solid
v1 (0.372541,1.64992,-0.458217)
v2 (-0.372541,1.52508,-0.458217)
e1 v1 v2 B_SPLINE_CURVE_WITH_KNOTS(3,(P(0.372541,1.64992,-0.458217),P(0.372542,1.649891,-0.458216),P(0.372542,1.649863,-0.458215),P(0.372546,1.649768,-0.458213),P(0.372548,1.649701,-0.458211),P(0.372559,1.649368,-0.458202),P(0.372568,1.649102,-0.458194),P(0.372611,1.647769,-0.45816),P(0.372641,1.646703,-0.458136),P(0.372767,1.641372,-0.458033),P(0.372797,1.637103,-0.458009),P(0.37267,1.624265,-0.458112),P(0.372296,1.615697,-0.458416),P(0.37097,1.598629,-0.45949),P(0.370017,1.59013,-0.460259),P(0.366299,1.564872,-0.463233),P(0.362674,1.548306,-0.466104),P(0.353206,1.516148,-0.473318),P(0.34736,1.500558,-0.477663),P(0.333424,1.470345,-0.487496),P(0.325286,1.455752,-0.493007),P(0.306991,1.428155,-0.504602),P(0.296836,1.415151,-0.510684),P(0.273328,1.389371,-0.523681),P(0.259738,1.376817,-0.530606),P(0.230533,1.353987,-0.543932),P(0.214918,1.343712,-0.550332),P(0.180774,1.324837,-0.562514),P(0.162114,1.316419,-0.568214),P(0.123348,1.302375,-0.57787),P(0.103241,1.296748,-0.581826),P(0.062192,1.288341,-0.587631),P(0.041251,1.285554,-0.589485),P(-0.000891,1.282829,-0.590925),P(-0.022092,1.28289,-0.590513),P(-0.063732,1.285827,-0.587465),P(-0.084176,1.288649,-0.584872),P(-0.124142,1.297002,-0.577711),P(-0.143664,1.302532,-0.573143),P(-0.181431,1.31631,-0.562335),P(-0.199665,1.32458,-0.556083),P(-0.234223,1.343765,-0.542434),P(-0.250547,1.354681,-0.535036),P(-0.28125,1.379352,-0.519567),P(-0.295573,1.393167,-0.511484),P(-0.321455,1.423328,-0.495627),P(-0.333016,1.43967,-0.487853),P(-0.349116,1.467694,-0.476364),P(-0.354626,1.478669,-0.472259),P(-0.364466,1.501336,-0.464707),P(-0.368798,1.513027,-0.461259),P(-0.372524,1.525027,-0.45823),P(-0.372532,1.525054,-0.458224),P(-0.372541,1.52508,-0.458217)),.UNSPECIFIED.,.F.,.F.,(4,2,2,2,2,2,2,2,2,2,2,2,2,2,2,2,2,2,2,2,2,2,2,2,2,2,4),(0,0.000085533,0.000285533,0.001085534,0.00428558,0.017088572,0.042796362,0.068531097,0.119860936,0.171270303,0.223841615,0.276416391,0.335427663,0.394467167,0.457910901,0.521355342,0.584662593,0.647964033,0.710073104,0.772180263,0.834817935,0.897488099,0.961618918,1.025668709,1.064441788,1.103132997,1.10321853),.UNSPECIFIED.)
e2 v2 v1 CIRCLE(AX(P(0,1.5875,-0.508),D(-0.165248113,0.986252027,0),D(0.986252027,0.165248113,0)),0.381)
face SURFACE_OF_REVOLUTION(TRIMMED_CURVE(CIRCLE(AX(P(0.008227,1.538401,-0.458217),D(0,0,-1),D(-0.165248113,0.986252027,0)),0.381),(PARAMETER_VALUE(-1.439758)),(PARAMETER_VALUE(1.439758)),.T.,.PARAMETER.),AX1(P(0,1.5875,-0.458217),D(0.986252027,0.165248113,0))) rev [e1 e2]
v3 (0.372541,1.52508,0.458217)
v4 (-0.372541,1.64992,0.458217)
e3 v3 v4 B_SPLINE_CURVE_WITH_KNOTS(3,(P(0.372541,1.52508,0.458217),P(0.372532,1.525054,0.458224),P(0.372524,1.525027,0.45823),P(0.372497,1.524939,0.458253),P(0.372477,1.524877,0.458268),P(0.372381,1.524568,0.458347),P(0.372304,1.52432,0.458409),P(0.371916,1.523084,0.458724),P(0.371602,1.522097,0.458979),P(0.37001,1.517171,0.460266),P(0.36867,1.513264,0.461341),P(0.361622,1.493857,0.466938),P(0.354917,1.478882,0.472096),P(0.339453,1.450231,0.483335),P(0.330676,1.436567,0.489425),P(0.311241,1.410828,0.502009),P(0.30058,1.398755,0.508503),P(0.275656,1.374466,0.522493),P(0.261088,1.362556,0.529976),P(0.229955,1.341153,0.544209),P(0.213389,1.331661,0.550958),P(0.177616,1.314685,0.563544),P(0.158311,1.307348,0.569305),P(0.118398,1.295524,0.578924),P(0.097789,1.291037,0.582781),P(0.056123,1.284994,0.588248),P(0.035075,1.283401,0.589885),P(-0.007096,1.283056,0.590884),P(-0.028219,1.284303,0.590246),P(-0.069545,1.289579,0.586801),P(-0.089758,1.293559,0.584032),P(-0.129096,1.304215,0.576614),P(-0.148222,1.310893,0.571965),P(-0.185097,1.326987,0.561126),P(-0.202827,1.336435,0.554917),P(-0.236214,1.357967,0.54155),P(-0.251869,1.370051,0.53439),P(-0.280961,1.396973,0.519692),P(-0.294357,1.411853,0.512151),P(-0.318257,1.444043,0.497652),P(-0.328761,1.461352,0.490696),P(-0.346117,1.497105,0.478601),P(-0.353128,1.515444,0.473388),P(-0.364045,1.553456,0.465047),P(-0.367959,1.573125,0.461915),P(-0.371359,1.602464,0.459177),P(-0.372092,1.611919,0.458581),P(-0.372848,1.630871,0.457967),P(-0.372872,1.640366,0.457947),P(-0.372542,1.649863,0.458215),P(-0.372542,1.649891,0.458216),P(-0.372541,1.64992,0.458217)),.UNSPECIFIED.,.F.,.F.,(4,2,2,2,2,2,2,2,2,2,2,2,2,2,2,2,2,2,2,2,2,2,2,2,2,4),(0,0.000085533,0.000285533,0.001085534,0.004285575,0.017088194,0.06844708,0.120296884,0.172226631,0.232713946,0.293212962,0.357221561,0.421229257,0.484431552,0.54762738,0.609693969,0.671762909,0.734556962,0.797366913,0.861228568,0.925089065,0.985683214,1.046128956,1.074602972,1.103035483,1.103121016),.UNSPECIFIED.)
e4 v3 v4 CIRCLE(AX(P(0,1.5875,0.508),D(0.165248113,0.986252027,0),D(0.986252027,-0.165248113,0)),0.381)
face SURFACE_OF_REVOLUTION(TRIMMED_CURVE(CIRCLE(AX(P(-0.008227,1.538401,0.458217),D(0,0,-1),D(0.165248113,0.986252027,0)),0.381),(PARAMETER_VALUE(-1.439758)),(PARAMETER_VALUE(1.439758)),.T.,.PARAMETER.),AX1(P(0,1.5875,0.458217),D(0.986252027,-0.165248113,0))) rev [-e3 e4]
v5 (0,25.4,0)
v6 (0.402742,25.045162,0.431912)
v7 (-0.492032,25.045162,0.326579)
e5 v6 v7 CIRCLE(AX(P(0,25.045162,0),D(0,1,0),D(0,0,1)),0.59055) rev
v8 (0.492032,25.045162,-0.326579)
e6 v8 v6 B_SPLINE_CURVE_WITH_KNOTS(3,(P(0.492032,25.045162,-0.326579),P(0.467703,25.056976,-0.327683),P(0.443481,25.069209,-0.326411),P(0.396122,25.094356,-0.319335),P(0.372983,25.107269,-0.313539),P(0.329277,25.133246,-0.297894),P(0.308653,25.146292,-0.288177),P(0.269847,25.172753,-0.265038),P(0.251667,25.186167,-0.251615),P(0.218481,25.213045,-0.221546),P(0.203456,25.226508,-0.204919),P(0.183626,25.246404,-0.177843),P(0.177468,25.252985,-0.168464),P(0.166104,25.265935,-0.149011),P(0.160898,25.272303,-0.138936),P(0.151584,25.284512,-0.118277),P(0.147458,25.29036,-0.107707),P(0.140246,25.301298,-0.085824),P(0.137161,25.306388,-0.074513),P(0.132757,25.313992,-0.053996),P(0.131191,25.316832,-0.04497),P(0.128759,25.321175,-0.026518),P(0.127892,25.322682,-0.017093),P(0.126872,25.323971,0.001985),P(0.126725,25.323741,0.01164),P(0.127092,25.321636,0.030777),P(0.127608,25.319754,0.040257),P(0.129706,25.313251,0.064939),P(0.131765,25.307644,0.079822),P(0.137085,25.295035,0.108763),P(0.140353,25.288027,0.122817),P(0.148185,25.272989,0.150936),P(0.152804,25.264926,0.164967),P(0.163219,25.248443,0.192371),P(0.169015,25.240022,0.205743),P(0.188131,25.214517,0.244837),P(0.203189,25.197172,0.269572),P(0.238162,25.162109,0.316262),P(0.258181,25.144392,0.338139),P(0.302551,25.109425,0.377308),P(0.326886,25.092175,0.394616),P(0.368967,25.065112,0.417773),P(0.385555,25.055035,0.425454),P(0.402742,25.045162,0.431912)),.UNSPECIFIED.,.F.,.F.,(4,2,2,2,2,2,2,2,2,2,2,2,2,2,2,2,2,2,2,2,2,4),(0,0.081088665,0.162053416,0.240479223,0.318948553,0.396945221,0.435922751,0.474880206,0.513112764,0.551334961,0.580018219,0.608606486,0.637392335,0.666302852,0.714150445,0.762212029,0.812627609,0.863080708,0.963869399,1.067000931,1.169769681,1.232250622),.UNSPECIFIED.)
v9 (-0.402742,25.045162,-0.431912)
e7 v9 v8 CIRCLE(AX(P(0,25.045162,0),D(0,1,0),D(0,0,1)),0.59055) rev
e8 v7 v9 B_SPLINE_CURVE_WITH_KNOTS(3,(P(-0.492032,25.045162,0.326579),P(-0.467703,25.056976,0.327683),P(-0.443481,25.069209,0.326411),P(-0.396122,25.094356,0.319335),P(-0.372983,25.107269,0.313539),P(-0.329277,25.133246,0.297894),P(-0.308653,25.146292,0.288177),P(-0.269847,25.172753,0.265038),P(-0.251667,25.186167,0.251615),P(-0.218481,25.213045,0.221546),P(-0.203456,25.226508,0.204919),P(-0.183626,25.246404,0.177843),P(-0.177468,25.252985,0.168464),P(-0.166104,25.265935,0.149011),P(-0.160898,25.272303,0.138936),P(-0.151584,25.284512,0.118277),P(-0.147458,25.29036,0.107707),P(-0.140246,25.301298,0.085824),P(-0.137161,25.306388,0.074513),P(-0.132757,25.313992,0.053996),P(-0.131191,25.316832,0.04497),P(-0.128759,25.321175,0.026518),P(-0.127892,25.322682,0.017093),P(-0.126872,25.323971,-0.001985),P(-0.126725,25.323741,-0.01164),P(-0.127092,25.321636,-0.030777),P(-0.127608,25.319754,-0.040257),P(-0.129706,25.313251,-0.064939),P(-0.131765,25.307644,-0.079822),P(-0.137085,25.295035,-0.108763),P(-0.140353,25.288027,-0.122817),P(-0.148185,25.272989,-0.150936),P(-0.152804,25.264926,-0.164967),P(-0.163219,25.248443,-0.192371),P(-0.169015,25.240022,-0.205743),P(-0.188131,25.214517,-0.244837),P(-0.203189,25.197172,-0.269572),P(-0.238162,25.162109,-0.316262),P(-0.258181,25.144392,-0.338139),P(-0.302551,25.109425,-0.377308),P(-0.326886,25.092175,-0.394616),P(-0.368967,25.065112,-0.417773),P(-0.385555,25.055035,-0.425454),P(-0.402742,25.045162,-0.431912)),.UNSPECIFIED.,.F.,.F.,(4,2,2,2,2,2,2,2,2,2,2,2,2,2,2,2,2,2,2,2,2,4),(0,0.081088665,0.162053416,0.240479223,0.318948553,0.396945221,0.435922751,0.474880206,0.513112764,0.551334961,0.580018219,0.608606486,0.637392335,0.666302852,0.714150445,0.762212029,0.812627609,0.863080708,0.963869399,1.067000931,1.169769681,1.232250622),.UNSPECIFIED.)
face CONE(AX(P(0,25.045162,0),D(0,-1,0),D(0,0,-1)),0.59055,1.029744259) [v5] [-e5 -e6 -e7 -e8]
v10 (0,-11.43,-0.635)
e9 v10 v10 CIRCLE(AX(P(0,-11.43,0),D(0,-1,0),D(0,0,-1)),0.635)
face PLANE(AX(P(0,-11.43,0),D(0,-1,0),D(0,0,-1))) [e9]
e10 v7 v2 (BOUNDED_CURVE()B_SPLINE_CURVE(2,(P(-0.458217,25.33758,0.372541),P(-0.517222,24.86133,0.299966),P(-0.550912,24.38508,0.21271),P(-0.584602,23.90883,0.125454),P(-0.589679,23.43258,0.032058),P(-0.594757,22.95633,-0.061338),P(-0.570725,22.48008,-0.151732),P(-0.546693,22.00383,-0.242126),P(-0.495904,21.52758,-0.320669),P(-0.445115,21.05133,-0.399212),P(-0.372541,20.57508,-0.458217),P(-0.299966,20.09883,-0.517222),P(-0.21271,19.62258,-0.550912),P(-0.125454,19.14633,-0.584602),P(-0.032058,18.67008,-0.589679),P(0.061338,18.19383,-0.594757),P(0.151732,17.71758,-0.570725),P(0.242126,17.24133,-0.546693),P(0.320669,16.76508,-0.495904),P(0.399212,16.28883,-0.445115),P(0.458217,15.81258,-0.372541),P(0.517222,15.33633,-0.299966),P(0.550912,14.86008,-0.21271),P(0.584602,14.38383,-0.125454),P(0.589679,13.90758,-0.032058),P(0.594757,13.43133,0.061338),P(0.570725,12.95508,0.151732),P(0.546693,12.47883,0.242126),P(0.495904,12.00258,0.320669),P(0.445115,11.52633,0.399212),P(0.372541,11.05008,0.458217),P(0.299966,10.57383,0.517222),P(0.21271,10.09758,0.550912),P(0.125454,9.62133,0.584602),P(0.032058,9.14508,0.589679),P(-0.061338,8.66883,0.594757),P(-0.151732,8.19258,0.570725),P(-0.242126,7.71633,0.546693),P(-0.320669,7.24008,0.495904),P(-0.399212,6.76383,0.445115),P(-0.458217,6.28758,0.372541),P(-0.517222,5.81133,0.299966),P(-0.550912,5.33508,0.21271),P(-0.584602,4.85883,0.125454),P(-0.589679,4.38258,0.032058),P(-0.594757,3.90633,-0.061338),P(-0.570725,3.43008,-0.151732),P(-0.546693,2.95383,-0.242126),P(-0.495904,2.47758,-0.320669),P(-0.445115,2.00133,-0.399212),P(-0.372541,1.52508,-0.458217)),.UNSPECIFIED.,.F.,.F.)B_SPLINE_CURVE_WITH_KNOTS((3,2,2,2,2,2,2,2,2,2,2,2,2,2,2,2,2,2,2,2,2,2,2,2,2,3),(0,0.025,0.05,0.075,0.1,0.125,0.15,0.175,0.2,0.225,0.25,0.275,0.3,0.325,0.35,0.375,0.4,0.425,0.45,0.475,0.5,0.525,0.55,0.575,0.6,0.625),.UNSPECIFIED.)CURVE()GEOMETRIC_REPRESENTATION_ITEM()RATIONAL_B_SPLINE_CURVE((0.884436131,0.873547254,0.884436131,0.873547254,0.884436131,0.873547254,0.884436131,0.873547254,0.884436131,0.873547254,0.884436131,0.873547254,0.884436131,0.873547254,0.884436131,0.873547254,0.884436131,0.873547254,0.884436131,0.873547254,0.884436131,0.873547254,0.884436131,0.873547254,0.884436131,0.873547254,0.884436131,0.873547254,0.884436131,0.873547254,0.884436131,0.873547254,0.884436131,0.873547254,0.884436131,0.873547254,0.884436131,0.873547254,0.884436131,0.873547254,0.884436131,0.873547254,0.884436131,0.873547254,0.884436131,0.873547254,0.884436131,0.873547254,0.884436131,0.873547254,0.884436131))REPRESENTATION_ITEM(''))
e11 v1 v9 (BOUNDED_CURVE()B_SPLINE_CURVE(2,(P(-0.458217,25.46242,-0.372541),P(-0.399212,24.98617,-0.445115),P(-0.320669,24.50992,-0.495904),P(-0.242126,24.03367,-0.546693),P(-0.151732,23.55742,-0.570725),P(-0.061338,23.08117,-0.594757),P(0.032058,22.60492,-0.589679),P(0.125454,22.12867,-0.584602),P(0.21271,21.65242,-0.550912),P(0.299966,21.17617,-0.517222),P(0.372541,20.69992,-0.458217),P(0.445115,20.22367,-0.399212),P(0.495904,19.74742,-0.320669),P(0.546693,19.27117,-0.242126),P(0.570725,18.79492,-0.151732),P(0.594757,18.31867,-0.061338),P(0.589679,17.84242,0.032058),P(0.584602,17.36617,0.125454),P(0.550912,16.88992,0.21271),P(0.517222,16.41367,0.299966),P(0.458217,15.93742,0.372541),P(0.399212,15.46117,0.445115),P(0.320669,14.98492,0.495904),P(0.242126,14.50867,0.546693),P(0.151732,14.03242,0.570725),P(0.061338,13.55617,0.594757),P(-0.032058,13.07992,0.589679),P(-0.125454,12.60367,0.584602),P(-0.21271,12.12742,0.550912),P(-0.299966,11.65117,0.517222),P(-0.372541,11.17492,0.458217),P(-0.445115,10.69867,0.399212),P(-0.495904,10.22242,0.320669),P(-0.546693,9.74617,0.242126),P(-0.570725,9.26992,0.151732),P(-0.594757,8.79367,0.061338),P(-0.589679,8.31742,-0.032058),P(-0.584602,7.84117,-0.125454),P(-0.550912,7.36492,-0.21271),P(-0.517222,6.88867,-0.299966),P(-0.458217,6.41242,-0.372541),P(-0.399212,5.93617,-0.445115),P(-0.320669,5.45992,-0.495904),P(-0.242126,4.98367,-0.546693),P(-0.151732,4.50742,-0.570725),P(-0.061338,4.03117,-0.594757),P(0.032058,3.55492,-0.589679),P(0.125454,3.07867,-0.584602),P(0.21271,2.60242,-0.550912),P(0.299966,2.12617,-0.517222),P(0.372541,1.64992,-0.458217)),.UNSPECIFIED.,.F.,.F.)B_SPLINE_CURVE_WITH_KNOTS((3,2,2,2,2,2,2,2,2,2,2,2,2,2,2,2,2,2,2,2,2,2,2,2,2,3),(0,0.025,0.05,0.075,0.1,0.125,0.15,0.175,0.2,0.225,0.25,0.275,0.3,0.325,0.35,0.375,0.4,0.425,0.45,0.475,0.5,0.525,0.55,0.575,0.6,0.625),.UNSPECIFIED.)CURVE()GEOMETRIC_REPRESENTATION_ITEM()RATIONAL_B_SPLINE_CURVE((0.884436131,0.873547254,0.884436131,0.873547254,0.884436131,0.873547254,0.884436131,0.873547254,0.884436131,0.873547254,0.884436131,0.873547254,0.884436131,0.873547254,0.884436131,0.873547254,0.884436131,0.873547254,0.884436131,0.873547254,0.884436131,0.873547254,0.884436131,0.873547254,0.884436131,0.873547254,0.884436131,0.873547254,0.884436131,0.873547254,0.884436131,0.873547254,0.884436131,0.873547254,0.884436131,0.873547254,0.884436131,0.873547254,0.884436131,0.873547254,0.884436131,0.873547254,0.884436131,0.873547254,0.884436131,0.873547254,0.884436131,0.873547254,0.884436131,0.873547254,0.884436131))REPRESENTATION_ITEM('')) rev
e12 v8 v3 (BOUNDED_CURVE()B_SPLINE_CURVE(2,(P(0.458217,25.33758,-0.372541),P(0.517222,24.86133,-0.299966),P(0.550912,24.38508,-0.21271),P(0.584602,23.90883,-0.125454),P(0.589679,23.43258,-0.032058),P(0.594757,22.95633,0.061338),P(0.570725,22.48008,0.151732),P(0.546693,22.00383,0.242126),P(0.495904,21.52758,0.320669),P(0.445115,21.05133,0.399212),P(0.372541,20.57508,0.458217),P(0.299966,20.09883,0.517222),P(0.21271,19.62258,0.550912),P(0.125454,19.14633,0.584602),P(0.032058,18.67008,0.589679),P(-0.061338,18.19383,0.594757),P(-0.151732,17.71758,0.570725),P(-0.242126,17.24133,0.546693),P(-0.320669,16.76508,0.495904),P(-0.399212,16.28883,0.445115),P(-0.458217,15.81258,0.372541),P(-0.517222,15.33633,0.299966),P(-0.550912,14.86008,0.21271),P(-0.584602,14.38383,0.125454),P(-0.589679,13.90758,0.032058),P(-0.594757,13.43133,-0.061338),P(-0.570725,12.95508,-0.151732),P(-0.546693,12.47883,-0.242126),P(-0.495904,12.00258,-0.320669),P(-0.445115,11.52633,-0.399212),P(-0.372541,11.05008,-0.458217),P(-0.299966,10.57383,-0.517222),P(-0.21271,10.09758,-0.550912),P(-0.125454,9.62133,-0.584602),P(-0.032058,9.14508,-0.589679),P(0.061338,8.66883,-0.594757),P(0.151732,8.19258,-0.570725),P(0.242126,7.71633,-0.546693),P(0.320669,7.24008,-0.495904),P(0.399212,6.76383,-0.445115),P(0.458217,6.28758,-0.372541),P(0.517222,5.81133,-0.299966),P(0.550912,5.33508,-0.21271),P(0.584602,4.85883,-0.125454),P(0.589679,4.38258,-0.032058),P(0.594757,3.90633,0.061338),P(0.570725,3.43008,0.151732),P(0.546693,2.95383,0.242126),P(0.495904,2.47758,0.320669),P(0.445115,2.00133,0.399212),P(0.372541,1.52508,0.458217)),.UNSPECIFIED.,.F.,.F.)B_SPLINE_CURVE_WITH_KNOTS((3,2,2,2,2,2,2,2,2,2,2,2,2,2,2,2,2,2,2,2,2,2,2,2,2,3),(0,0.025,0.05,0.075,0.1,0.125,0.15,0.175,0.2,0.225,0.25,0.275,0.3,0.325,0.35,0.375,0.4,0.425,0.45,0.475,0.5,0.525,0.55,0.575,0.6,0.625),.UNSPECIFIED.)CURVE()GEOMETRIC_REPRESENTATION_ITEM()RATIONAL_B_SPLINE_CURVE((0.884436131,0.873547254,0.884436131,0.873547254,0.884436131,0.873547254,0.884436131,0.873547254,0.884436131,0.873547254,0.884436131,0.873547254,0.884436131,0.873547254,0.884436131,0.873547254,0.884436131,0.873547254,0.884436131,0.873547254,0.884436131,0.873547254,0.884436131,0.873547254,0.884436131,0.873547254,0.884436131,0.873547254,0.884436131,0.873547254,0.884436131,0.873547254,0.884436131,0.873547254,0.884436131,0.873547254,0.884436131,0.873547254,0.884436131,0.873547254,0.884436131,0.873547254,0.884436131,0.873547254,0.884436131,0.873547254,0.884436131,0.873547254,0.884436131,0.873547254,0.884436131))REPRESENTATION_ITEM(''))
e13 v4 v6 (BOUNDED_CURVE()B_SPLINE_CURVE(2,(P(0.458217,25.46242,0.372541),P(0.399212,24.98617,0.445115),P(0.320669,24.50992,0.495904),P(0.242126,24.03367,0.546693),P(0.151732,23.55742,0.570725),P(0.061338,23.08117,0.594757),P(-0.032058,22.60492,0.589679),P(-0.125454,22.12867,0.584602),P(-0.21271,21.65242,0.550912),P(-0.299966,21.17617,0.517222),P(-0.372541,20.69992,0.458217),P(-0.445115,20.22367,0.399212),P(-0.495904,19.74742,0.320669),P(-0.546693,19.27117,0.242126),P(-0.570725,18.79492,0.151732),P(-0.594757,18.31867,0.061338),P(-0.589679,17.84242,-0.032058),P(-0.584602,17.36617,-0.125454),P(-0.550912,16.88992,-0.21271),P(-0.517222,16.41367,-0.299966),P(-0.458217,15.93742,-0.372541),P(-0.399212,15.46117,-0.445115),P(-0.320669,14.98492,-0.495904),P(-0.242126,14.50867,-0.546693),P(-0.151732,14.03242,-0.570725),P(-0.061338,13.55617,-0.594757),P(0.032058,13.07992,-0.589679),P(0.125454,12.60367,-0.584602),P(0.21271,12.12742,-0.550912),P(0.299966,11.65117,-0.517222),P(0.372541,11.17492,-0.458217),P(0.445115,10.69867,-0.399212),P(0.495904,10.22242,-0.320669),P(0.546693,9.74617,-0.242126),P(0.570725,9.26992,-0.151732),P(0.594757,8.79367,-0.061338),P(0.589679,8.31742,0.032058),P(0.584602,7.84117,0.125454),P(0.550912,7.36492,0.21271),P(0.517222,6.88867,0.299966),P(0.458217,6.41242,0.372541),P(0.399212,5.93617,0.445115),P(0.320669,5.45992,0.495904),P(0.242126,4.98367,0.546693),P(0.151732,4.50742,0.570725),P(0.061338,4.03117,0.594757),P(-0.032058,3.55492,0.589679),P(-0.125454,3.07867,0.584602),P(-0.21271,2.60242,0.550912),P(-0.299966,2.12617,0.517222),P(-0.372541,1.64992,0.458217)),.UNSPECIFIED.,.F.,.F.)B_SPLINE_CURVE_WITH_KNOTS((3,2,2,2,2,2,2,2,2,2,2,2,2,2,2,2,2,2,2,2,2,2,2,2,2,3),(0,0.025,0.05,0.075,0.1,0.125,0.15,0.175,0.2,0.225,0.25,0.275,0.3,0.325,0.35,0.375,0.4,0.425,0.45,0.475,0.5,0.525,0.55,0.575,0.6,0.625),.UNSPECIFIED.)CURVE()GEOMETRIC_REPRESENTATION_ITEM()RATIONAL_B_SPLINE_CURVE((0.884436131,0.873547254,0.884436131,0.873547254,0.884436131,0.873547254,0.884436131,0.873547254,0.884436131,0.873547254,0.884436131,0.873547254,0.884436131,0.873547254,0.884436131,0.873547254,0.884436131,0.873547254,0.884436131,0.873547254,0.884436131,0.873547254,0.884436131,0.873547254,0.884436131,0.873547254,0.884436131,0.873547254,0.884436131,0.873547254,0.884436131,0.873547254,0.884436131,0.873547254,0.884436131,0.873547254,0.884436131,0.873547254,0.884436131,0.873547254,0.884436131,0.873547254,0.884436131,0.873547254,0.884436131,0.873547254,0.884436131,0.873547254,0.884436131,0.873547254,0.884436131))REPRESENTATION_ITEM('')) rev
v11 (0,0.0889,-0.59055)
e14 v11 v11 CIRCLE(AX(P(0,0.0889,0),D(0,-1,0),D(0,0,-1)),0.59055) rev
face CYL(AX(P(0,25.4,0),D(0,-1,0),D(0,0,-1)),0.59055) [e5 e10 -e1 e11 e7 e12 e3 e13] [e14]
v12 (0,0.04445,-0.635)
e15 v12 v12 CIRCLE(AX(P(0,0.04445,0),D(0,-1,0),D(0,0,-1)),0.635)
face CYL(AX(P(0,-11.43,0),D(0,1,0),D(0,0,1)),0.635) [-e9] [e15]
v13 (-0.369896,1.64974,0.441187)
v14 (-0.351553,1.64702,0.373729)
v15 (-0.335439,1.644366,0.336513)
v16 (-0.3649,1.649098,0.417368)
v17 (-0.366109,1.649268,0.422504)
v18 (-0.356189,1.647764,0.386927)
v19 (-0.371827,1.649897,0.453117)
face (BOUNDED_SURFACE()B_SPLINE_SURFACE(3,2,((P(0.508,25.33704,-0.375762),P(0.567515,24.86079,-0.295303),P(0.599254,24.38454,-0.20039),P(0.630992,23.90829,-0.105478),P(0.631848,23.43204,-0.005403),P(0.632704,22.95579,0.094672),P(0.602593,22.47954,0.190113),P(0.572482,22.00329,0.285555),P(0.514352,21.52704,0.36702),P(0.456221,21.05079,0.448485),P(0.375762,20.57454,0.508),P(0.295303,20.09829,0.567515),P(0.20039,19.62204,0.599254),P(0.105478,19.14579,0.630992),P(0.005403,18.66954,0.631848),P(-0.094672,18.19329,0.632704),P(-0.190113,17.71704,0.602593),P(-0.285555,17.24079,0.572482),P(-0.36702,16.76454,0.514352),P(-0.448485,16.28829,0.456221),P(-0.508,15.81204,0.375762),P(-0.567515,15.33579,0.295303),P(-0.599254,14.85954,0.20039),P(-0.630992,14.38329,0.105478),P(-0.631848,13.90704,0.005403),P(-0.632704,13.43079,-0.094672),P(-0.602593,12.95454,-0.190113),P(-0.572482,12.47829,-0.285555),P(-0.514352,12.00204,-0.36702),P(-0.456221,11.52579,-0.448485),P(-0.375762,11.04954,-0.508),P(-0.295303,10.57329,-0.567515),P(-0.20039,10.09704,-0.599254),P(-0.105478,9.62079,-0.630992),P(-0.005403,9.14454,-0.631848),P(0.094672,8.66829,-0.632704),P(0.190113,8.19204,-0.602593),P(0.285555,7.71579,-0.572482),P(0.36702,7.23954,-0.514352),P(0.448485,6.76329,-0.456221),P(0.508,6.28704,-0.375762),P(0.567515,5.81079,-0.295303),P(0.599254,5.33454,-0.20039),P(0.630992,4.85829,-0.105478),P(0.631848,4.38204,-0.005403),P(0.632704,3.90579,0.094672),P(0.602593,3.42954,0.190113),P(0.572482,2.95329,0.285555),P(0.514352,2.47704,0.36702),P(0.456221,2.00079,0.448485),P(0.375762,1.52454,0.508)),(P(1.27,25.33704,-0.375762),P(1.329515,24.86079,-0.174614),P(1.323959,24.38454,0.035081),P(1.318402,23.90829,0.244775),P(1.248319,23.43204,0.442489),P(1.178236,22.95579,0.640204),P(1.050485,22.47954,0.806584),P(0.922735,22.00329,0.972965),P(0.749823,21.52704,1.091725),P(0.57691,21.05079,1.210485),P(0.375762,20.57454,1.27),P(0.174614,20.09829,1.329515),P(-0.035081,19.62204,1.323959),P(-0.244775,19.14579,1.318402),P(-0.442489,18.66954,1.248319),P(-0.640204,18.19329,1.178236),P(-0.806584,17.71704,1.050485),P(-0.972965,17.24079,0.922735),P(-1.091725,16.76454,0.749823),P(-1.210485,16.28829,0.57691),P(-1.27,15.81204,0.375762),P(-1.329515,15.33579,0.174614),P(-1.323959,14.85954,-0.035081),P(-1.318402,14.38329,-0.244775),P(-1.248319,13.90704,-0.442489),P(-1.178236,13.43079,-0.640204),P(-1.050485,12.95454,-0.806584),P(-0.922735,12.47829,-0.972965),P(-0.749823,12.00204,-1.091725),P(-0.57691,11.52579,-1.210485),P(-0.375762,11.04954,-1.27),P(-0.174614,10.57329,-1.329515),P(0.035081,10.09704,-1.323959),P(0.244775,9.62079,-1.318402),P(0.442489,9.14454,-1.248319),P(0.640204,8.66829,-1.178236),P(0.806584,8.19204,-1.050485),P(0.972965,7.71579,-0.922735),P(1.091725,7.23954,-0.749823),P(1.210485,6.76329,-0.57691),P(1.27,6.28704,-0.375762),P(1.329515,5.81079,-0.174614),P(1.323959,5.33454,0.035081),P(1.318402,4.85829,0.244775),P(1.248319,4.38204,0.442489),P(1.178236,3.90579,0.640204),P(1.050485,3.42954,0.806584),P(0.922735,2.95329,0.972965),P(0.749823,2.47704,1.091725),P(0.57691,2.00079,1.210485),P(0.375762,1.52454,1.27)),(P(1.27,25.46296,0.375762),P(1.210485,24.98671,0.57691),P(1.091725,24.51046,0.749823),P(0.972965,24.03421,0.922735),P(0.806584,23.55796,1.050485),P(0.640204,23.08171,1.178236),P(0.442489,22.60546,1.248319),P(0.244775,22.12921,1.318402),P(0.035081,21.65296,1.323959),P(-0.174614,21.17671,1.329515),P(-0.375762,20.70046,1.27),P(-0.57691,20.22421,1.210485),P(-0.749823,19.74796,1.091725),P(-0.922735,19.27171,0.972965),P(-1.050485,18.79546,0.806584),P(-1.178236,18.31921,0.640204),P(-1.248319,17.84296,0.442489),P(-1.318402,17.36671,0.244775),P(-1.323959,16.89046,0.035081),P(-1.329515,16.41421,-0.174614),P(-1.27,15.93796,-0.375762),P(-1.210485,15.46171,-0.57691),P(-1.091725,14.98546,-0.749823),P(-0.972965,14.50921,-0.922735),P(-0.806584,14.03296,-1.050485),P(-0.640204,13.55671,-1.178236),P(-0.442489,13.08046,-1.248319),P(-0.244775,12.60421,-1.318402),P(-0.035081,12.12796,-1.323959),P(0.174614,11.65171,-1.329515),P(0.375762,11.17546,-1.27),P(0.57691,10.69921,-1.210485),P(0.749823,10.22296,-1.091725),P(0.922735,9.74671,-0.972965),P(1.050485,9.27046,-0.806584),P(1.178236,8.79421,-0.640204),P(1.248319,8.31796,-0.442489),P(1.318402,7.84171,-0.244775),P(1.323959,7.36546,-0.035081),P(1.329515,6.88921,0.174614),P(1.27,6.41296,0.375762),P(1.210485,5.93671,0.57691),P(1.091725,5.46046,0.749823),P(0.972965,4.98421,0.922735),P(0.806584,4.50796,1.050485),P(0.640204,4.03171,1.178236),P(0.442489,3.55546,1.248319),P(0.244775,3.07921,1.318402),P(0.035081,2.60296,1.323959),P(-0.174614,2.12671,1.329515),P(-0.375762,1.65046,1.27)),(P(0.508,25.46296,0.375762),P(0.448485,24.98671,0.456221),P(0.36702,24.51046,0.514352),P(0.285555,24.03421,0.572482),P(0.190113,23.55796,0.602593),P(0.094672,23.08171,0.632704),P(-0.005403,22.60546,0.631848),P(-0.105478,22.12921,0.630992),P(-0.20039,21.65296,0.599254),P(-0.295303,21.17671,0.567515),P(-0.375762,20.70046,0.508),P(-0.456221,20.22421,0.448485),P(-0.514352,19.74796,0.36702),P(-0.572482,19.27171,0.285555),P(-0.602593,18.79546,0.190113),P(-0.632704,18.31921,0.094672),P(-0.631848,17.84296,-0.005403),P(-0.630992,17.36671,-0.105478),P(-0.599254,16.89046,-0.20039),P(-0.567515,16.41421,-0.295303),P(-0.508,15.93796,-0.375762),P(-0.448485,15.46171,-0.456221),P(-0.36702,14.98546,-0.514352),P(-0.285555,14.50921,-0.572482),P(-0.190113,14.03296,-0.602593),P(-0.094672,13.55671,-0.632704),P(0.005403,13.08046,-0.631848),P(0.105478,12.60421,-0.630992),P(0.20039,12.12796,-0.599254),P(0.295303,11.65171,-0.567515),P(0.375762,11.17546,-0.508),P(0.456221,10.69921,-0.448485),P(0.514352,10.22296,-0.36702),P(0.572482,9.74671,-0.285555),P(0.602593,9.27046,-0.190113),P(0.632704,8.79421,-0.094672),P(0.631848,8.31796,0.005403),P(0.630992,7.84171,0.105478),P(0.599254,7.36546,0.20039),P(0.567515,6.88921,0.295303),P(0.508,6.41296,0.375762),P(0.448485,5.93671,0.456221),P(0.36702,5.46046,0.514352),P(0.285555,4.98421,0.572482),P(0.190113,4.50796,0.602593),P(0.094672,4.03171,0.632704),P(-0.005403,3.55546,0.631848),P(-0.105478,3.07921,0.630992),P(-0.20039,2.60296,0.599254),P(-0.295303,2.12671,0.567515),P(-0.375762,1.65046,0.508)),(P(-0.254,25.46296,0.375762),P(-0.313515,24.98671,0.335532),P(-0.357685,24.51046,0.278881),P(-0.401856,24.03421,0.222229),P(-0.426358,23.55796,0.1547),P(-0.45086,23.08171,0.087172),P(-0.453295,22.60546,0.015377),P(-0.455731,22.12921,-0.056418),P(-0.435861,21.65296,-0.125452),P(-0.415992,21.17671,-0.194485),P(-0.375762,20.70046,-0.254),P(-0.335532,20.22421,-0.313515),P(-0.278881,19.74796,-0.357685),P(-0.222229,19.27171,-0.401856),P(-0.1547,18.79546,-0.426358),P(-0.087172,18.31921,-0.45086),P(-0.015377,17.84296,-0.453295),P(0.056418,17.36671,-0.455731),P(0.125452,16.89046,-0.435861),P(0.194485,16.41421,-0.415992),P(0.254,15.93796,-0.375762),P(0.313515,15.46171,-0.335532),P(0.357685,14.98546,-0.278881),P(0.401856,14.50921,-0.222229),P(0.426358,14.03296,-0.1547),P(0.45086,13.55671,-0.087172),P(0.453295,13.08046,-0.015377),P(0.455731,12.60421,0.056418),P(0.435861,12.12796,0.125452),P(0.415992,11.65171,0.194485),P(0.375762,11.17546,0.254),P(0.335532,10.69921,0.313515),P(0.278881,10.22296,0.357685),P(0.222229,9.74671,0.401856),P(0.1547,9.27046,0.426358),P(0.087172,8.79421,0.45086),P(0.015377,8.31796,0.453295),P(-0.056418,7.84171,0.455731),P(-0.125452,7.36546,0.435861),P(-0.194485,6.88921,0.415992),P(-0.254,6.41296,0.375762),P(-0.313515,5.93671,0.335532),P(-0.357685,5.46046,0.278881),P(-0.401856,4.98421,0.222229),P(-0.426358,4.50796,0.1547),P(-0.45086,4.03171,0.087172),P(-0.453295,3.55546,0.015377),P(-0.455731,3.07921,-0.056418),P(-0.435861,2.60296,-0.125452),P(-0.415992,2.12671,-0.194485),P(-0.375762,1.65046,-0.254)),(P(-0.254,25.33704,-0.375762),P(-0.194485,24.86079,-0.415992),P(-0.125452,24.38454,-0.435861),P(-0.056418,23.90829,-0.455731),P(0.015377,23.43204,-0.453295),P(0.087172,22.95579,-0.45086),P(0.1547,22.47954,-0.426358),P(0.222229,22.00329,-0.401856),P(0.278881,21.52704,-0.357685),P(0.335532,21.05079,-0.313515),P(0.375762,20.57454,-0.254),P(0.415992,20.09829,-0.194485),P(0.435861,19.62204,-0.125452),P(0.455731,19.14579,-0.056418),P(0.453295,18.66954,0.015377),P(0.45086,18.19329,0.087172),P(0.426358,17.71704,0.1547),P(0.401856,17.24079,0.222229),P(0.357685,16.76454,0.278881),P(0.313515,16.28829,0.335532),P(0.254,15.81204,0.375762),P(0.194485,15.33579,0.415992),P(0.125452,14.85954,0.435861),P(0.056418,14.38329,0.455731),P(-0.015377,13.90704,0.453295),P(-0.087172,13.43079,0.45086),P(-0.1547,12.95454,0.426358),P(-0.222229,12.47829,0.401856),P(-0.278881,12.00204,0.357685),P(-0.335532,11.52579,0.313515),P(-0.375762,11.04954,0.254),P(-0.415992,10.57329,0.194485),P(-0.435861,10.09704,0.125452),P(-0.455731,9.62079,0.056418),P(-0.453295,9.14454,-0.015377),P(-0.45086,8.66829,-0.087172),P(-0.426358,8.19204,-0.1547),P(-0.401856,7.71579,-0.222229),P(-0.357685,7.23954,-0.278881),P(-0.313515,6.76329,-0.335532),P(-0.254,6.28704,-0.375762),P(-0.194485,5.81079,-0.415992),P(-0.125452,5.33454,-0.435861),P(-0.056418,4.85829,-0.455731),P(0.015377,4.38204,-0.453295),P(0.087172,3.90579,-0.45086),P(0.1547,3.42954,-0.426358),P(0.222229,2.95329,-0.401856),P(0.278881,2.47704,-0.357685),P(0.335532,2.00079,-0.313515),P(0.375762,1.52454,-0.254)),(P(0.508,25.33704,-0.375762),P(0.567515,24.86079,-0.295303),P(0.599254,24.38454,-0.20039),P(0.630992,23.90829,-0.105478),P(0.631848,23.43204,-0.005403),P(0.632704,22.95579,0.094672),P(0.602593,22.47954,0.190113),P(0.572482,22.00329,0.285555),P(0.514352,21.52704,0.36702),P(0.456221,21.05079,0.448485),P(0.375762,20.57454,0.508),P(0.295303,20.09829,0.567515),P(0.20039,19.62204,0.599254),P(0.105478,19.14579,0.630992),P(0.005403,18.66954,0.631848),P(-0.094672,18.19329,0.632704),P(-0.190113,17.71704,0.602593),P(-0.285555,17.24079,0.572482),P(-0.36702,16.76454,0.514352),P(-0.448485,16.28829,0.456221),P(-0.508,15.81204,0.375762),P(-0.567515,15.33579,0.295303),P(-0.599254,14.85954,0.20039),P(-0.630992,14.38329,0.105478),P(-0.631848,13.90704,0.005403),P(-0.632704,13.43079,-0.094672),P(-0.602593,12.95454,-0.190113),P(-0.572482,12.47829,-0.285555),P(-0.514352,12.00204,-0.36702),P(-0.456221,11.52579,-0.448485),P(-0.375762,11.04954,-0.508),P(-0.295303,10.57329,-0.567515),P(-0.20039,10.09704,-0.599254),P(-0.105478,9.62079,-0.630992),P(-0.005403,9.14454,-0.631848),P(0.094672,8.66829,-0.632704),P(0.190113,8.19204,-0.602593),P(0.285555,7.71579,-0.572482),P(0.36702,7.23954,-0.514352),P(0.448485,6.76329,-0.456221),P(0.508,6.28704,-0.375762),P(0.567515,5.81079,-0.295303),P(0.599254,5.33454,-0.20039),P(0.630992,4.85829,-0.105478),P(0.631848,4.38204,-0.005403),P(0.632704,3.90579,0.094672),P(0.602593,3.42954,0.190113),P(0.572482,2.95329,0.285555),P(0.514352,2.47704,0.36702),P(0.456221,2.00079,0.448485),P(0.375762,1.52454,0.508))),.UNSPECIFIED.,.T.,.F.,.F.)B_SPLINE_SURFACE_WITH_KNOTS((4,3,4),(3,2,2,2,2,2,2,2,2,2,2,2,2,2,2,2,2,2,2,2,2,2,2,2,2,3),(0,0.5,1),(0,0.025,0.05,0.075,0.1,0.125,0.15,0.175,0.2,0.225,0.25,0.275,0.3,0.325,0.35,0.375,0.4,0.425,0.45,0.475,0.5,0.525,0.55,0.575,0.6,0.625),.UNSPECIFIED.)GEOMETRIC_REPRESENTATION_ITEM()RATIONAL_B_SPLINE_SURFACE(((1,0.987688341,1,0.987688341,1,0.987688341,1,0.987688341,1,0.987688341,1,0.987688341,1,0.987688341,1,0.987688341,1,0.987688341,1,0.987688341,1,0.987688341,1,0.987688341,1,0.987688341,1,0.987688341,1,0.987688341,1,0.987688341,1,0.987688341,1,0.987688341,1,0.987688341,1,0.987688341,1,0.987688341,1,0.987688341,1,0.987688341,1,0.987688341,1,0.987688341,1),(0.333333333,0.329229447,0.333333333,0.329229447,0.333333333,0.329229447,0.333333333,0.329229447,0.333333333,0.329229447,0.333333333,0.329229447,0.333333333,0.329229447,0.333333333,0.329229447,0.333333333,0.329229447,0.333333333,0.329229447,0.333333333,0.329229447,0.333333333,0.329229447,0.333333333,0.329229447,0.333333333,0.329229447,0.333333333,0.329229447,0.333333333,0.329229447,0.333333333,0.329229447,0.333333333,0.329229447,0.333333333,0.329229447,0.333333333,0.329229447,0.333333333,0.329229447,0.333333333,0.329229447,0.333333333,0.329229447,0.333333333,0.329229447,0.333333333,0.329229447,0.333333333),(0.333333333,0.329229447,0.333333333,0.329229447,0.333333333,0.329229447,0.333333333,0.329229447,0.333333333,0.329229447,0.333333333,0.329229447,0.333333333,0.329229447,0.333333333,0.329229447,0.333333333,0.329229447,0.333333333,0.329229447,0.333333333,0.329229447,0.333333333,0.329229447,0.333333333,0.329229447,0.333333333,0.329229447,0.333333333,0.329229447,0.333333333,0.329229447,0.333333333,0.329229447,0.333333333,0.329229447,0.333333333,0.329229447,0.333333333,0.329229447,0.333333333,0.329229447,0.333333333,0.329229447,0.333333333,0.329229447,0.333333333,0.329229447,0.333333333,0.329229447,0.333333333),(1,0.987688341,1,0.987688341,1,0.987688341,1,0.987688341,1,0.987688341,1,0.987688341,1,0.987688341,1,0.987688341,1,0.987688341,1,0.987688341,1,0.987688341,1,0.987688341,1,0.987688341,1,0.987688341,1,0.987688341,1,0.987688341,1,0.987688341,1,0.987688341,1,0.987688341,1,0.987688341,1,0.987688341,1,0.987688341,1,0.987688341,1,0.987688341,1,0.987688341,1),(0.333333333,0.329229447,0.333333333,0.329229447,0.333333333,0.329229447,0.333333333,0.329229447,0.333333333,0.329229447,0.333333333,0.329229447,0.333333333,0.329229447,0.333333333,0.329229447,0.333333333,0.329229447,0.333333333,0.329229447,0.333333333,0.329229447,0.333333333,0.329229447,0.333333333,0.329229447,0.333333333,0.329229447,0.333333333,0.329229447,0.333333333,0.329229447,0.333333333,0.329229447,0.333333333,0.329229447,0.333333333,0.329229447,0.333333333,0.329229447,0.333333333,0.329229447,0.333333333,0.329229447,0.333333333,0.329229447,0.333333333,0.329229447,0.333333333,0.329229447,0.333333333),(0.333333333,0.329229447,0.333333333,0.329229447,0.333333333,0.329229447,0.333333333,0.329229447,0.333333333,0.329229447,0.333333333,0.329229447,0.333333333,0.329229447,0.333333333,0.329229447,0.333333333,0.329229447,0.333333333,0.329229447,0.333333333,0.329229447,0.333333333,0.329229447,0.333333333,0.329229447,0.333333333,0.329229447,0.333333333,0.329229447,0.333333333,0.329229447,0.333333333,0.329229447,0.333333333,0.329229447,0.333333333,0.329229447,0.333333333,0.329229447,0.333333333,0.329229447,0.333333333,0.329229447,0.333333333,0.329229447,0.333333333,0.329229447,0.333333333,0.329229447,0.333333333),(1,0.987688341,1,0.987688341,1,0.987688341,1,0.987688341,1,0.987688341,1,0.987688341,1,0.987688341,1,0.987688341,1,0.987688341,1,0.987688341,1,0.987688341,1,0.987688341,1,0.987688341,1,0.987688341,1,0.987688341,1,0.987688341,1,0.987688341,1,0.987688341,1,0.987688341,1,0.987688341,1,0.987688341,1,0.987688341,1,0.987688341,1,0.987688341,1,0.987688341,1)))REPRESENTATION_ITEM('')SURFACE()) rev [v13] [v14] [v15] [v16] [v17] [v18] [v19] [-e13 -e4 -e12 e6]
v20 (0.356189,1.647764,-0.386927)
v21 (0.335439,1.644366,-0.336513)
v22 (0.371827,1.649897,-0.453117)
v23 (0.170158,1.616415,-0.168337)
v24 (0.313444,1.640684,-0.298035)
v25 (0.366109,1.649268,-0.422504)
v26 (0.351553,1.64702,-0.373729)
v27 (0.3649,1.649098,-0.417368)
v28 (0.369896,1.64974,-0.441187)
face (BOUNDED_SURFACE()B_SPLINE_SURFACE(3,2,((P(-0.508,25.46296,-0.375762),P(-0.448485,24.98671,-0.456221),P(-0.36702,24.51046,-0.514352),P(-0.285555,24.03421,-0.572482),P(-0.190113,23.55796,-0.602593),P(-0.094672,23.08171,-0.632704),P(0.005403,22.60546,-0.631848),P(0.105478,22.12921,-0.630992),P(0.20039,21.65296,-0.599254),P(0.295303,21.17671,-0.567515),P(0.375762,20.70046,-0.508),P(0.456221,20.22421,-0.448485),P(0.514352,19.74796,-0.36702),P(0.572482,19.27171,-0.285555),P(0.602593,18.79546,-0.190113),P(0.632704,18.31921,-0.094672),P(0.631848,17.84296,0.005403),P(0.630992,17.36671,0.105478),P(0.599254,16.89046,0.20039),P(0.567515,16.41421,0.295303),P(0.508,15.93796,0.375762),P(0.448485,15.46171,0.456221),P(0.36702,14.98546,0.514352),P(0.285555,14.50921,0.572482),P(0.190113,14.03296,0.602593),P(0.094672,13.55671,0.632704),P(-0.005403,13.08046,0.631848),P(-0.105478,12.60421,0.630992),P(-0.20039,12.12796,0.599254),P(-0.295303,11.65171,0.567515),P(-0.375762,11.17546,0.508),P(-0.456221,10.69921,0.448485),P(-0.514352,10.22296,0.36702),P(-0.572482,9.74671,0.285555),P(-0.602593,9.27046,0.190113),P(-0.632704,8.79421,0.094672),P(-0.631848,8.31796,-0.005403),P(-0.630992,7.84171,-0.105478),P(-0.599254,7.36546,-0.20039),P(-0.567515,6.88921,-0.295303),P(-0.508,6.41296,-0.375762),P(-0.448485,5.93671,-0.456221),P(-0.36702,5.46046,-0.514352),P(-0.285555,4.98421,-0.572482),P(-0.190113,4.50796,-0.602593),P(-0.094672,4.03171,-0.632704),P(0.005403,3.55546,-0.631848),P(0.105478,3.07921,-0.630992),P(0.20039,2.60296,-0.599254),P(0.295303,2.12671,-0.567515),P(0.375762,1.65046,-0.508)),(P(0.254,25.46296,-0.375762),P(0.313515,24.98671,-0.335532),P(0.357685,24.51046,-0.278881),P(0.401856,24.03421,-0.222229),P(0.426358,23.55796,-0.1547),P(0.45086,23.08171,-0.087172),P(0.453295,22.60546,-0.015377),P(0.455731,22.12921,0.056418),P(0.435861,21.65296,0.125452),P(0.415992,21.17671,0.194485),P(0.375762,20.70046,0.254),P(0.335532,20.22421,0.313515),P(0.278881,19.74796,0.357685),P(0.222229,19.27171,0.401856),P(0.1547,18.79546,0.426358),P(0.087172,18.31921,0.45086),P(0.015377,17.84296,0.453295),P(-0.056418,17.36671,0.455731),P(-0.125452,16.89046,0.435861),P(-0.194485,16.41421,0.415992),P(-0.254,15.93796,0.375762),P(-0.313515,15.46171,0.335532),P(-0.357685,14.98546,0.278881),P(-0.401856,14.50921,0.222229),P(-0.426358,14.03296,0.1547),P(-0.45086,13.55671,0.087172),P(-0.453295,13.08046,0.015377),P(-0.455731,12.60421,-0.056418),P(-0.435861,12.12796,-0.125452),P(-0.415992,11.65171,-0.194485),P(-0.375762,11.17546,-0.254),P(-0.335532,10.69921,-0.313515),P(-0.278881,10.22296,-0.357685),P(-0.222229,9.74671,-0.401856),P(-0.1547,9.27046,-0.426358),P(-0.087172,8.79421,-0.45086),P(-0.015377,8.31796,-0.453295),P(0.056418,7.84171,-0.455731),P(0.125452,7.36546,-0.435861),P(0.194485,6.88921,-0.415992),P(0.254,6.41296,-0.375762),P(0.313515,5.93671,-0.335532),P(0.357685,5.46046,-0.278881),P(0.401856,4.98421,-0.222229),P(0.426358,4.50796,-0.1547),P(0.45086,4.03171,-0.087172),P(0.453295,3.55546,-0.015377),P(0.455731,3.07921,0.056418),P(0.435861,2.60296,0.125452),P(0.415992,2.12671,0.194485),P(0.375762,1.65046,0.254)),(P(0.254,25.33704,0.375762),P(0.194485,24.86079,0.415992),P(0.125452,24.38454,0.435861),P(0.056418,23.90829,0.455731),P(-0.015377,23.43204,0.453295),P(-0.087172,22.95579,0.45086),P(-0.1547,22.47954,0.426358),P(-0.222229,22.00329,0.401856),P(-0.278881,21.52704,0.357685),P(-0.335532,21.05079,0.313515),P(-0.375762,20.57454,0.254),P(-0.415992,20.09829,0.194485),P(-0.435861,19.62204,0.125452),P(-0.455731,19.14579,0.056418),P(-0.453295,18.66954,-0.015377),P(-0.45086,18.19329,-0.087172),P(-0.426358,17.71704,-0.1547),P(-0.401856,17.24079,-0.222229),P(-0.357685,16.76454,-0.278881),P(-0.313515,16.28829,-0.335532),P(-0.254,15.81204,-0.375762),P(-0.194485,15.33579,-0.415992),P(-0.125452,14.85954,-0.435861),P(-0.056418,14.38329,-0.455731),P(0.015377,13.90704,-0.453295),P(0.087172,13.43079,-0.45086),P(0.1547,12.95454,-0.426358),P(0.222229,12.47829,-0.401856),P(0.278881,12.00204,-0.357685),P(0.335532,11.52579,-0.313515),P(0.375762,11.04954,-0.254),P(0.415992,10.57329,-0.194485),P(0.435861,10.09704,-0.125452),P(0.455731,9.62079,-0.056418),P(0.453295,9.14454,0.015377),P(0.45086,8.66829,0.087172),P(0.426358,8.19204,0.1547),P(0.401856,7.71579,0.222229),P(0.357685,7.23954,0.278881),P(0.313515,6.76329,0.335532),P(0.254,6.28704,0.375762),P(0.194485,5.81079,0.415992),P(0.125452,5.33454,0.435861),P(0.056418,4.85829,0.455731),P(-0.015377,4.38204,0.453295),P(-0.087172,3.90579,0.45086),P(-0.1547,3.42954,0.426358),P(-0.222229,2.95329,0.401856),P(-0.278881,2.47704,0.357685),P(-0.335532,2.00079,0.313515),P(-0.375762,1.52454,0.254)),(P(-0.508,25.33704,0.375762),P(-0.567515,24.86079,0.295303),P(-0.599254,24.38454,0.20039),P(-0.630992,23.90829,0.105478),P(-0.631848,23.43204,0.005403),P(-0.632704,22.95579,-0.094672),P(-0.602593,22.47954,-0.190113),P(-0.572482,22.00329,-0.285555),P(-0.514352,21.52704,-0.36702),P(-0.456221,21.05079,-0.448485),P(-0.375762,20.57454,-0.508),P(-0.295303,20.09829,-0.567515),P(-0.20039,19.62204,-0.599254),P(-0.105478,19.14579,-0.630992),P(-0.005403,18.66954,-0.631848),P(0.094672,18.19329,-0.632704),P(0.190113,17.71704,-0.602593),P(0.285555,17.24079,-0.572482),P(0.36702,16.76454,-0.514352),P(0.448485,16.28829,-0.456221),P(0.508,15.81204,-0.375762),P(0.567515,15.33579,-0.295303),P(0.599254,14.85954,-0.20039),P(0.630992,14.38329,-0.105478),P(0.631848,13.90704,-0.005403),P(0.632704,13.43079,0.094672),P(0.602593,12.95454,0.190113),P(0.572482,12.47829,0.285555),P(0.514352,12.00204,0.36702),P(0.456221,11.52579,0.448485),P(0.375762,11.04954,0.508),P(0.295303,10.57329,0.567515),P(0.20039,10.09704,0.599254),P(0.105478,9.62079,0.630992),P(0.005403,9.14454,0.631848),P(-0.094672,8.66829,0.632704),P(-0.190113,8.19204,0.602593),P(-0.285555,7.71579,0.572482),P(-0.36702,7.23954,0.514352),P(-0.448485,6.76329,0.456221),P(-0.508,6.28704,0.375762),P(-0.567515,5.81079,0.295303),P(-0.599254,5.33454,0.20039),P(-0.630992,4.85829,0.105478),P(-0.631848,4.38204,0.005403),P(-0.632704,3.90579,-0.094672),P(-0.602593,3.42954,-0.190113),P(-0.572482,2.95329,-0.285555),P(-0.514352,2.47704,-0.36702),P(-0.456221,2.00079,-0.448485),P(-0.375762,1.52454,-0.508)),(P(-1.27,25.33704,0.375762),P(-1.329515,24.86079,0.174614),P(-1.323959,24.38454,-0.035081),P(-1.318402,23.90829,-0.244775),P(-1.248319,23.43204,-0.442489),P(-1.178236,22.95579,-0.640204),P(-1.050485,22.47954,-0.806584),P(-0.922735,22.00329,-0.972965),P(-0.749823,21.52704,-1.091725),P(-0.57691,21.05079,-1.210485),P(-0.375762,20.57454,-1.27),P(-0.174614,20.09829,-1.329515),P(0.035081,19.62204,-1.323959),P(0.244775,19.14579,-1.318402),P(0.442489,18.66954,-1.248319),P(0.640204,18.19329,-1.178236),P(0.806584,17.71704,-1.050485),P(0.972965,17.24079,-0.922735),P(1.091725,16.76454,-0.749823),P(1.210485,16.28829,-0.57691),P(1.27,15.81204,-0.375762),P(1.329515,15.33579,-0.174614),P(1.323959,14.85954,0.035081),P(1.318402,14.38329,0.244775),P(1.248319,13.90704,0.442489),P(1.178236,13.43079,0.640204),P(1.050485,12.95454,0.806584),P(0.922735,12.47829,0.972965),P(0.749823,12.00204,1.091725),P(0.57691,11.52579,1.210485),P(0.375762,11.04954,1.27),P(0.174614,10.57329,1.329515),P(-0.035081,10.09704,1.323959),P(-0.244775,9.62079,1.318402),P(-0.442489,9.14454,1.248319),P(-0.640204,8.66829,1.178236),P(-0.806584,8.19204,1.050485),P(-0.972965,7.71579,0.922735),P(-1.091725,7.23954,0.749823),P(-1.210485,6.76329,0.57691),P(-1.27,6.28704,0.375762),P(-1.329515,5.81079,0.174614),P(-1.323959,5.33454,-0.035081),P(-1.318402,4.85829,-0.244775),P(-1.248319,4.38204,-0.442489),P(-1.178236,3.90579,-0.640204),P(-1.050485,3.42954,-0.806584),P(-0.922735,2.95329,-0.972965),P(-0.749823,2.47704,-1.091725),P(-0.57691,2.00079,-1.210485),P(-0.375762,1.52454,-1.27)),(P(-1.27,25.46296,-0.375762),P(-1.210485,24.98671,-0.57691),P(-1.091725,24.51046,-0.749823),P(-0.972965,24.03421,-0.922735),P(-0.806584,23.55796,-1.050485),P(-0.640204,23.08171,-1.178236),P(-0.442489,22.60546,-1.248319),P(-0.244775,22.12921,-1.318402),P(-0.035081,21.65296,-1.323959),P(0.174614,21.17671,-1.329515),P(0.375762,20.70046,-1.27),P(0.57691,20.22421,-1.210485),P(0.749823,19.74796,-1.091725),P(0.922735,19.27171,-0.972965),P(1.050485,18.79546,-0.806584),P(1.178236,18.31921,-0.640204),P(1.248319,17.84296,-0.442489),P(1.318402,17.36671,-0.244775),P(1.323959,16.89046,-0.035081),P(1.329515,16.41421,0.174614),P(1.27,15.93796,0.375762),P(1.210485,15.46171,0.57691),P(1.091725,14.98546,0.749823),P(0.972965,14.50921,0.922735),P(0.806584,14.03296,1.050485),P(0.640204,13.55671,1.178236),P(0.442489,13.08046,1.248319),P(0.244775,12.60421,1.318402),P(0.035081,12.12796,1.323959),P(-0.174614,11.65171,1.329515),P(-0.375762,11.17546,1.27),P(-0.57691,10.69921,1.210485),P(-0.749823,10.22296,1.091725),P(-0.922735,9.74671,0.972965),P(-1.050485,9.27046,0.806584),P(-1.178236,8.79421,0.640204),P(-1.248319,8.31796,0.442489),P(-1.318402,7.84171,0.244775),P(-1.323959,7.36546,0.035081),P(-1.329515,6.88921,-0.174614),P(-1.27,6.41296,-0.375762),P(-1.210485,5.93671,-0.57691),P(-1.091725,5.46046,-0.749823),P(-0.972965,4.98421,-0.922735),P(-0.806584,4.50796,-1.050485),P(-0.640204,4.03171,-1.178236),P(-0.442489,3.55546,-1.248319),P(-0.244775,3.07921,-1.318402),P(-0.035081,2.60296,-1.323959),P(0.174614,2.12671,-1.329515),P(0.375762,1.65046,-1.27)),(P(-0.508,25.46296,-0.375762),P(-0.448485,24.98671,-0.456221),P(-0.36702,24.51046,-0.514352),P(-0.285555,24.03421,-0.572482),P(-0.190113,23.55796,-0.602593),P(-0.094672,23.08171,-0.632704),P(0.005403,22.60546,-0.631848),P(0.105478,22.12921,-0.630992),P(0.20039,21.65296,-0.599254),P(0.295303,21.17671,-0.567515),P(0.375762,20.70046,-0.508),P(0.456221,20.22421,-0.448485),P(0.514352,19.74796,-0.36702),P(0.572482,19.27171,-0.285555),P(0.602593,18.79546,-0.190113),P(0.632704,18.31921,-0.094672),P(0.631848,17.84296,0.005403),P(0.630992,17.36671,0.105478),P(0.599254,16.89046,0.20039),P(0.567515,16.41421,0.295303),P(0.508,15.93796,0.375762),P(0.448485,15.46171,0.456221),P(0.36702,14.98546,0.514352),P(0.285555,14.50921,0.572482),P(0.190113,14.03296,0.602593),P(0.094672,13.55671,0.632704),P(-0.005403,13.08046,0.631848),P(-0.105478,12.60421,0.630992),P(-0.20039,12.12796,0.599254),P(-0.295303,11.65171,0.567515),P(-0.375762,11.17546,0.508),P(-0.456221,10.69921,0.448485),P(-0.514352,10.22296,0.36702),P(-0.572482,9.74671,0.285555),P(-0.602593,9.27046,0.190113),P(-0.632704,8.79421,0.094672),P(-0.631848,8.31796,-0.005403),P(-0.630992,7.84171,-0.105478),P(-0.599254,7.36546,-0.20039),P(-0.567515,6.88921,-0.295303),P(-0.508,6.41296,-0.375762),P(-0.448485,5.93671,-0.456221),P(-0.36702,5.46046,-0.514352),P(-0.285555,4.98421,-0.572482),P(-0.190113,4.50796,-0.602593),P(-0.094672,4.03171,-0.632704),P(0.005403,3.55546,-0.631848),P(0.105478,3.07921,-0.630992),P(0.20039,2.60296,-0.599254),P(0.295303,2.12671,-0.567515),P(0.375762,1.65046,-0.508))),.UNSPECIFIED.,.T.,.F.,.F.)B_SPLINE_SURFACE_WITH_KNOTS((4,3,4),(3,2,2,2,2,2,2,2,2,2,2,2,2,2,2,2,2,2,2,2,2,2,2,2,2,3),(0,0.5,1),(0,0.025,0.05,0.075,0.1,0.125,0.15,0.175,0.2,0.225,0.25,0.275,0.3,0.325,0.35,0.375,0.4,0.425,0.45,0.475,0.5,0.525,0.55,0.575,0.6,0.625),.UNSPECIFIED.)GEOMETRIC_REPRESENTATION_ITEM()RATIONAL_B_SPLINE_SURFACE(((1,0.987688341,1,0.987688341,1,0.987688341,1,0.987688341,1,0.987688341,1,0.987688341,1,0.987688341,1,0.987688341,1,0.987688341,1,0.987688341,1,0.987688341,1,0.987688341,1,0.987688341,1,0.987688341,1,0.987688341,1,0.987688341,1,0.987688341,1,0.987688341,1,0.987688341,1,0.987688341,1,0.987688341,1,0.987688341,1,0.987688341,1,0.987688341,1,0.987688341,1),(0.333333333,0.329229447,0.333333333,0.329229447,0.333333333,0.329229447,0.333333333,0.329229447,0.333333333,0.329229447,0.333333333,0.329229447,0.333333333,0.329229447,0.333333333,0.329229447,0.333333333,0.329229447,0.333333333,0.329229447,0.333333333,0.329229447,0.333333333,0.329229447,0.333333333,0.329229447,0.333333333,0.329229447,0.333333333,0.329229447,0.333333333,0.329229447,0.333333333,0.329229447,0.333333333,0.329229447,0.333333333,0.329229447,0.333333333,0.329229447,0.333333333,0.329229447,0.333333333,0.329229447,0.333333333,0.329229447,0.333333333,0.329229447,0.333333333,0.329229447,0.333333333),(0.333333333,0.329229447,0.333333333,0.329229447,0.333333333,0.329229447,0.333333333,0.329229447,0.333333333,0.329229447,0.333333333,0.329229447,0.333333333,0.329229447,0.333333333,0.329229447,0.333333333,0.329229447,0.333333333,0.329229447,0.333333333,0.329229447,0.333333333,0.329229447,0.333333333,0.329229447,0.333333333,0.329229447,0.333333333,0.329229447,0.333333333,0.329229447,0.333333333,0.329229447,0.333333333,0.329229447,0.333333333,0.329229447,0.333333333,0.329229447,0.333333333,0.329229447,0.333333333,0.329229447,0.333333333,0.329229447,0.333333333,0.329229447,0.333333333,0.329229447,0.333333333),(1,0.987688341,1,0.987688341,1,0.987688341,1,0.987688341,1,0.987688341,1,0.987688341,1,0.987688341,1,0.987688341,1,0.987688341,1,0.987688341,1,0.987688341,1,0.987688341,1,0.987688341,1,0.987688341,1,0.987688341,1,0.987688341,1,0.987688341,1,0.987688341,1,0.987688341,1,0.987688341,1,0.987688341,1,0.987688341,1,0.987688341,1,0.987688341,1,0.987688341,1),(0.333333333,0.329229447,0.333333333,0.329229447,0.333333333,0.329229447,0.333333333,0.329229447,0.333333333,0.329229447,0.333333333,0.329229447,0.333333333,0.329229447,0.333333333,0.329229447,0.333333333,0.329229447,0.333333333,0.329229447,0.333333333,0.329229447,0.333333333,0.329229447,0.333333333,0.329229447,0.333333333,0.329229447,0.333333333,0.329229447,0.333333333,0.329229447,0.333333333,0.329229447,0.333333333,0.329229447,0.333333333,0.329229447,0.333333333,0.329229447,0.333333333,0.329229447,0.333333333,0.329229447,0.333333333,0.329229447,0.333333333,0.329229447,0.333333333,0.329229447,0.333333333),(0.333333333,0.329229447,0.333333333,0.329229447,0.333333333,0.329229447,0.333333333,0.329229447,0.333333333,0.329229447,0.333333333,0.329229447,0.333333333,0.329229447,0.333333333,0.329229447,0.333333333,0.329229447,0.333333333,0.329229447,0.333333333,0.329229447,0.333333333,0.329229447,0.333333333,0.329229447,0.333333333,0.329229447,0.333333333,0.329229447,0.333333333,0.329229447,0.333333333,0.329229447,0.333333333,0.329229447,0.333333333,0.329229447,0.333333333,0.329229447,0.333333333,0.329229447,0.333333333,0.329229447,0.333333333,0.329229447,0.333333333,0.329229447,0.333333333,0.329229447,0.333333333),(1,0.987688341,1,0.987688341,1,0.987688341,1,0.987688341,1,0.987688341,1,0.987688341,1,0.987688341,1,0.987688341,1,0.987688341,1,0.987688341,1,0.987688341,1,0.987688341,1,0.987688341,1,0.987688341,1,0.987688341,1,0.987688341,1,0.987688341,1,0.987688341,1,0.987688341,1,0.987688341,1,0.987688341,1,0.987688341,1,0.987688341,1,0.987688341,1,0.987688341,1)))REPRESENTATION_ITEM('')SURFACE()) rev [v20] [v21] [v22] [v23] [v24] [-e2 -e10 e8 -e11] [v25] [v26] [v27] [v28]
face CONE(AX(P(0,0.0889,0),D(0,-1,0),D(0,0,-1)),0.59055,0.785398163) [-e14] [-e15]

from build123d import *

# Parameters (mm, degrees)
SKETCH1_R              = 0.5905499999999999
BOSS_EXTRUDE1_DEPTH    = 25.4
CHAMFER2_SIZE2         = 0.59055
CHAMFER2_SIZE          = 0.354838239
CUT_SWEEP1_PITCH       = 19.049999999999965
CUT_SWEEP1_HEIGHT      = 23.812500000000007
CUT_SWEEP1_RADIUS      = 0.508
CUT_SWEEP1_START_ANGLE = 89.9999999999998
CUT_SWEEP1_PROFILE_R   = 0.381
CUT_SWEEP2_PITCH       = 19.04999999999996
CUT_SWEEP2_HEIGHT      = 23.812500000000007
CUT_SWEEP2_RADIUS      = 0.508
CUT_SWEEP2_START_ANGLE = -90.00000000000061
CUT_SWEEP2_PROFILE_R   = 0.381
SKETCH105_R            = 0.6350000000000001
BOSS_EXTRUDE2_DEPTH    = 11.43
CHAMFER3_SIZE          = 0.0889


# Some blends are built 0.0001 mm under size
with BuildPart() as part:
    # Sketch1 → Boss-Extrude1 (new body)
    with BuildSketch(Plane(origin=(0, 0, 0), x_dir=(1, 0, 0), z_dir=(0, 1, 0))):
        with Locations(Location((0, 0, 0), (0, 0, 270))):
            Circle(SKETCH1_R)
    extrude(amount=BOSS_EXTRUDE1_DEPTH)

    # Chamfer2
    chamfer2_edges = [part.edges().sort_by_distance(p)[0] for p in [
        (1.8e-16, 25.4, -0.5905499999999999),
    ]]
    chamfer2_side = [part.faces().sort_by_distance(p)[0] for p in [
        (1.8e-16, 25.392903235228665, -0.5905499999999999),
    ]]
    chamfer(chamfer2_edges, length=CHAMFER2_SIZE - 0.0001, length2=CHAMFER2_SIZE2 - 0.0001, reference=chamfer2_side[0])  # a hair under: the kernel refuses the full size

    # Cut-Sweep1: sweep along a helix
    with BuildLine() as cut_sweep1_path:
        add(Helix(CUT_SWEEP1_PITCH, CUT_SWEEP1_HEIGHT, CUT_SWEEP1_RADIUS, center=(0, 25.4, -1.041e-14), direction=(0, -1, 0), mode=Mode.PRIVATE).rotate(Axis((0, 25.4, -1.041e-14), (0, -1, 0)), CUT_SWEEP1_START_ANGLE))
    # Cut-Sweep1 profile (on start of the path) → Cut-Sweep1 (sweep, cut)
    with BuildSketch(Plane(origin=(0.508, 25.4, -1.21e-14), x_dir=(0, -0.1652481132319178, -0.9862520271580136), z_dir=(1.921925931895021e-14, -0.9862520271580136, 0.1652481132319178))):
        Circle(CUT_SWEEP1_PROFILE_R)
    sweep(path=cut_sweep1_path.line, is_frenet=True, mode=Mode.SUBTRACT)

    # Cut-Sweep2: sweep along a helix
    with BuildLine() as cut_sweep2_path:
        add(Helix(CUT_SWEEP2_PITCH, CUT_SWEEP2_HEIGHT, CUT_SWEEP2_RADIUS, center=(0, 25.4, -1.041e-14), direction=(0, -1, 0), mode=Mode.PRIVATE).rotate(Axis((0, 25.4, -1.041e-14), (0, -1, 0)), CUT_SWEEP2_START_ANGLE))
    # Cut-Sweep2 profile (on start of the path) → Cut-Sweep2 (sweep, cut)
    with BuildSketch(Plane(origin=(-0.508, 25.4, -5.11e-15), x_dir=(0, 0.16524811323191255, -0.9862520271580145), z_dir=(-1.1362396212821961e-14, -0.9862520271580145, -0.16524811323191255))):
        Circle(CUT_SWEEP2_PROFILE_R)
    sweep(path=cut_sweep2_path.line, is_frenet=True, mode=Mode.SUBTRACT)

    # Sketch99 → Cut-Revolve2 (revolve, cut)
    with BuildSketch(Plane(origin=(-0.25872485507192033, 1.5441502344536127, -6.94e-15), x_dir=(0.9862520271579334, 0.16524811323239766, 0), z_dir=(-0.16524811323239766, 0.9862520271579334, -4.431704066456352e-15))):
        with BuildLine():
            Line((0.6400649611478554, 0.45821705624207343), (-0.11540220163499314, 0.45821705624201264))
            ThreePointArc((-0.11540220163499314, 0.45821705624201264), (0.26233137975645776, 0.12700000000000367), (0.6400649611478554, 0.45821705624207343))
        make_face()
    revolve(axis=Axis((0.3725405103729167, 1.6499197616294616, -0.4582170562420799), (-0.9862520271579333, -0.16524811323239758, 7.957858848936075e-14)), mode=Mode.SUBTRACT)

    # Sketch100 → Cut-Revolve3 (revolve, cut)
    with BuildSketch(Plane(origin=(0.2587248550719193, 1.5441502344536062, -4e-17), x_dir=(0.9862520271579334, -0.16524811323239763, 0), z_dir=(0.16524811323239763, 0.9862520271579334, 0))):
        with BuildLine():
            Line((0.11540220163498754, -0.45821705624198633), (-0.6400649611478528, -0.45821705624201065))
            ThreePointArc((-0.6400649611478528, -0.45821705624201065), (-0.2623313797564433, -0.12699999999998968), (0.11540220163498754, -0.45821705624198633))
        make_face()
    revolve(axis=Axis((0.3725405103729143, 1.52508023837056, 0.4582170562419864), (-0.9862520271579333, 0.16524811323239763, 3.214716649525158e-14)), mode=Mode.SUBTRACT)

    # Sketch105 → Boss-Extrude2 (add)
    with BuildSketch(Plane.XZ):
        with Locations(Location((0, 0, 0), (0, 0, 270))):
            Circle(SKETCH105_R)
    extrude(amount=BOSS_EXTRUDE2_DEPTH)

    # Chamfer3
    # the kernel refuses this chamfer: 0.0889 mm, written as the material it adds along each edge
    with BuildSketch(Plane(origin=(0, 0, 0), x_dir=(-1.8e-16, 0, 1), z_dir=(-1, 0, -1.8e-16))) as chamfer3_piece_1_section:
        Polygon((0.5905499999999999 + CHAMFER3_SIZE, 0), (0.5905499999999999, CHAMFER3_SIZE), (0.5905499999999999, 0), align=None)
    chamfer3_piece_1 = revolve(axis=Axis((0, 0, 0), (0, 1, 0)), mode=Mode.PRIVATE)
    chamfer3_piece_1 = chamfer3_piece_1 & Plane(origin=(0, 0.06629689110625198, 0), x_dir=(-1.8e-16, 0, -1), z_dir=(0, 1, 0)) * Cylinder(0.6350000000000001, 3, mode=Mode.PRIVATE)
    add(chamfer3_piece_1)


solid = part.part
